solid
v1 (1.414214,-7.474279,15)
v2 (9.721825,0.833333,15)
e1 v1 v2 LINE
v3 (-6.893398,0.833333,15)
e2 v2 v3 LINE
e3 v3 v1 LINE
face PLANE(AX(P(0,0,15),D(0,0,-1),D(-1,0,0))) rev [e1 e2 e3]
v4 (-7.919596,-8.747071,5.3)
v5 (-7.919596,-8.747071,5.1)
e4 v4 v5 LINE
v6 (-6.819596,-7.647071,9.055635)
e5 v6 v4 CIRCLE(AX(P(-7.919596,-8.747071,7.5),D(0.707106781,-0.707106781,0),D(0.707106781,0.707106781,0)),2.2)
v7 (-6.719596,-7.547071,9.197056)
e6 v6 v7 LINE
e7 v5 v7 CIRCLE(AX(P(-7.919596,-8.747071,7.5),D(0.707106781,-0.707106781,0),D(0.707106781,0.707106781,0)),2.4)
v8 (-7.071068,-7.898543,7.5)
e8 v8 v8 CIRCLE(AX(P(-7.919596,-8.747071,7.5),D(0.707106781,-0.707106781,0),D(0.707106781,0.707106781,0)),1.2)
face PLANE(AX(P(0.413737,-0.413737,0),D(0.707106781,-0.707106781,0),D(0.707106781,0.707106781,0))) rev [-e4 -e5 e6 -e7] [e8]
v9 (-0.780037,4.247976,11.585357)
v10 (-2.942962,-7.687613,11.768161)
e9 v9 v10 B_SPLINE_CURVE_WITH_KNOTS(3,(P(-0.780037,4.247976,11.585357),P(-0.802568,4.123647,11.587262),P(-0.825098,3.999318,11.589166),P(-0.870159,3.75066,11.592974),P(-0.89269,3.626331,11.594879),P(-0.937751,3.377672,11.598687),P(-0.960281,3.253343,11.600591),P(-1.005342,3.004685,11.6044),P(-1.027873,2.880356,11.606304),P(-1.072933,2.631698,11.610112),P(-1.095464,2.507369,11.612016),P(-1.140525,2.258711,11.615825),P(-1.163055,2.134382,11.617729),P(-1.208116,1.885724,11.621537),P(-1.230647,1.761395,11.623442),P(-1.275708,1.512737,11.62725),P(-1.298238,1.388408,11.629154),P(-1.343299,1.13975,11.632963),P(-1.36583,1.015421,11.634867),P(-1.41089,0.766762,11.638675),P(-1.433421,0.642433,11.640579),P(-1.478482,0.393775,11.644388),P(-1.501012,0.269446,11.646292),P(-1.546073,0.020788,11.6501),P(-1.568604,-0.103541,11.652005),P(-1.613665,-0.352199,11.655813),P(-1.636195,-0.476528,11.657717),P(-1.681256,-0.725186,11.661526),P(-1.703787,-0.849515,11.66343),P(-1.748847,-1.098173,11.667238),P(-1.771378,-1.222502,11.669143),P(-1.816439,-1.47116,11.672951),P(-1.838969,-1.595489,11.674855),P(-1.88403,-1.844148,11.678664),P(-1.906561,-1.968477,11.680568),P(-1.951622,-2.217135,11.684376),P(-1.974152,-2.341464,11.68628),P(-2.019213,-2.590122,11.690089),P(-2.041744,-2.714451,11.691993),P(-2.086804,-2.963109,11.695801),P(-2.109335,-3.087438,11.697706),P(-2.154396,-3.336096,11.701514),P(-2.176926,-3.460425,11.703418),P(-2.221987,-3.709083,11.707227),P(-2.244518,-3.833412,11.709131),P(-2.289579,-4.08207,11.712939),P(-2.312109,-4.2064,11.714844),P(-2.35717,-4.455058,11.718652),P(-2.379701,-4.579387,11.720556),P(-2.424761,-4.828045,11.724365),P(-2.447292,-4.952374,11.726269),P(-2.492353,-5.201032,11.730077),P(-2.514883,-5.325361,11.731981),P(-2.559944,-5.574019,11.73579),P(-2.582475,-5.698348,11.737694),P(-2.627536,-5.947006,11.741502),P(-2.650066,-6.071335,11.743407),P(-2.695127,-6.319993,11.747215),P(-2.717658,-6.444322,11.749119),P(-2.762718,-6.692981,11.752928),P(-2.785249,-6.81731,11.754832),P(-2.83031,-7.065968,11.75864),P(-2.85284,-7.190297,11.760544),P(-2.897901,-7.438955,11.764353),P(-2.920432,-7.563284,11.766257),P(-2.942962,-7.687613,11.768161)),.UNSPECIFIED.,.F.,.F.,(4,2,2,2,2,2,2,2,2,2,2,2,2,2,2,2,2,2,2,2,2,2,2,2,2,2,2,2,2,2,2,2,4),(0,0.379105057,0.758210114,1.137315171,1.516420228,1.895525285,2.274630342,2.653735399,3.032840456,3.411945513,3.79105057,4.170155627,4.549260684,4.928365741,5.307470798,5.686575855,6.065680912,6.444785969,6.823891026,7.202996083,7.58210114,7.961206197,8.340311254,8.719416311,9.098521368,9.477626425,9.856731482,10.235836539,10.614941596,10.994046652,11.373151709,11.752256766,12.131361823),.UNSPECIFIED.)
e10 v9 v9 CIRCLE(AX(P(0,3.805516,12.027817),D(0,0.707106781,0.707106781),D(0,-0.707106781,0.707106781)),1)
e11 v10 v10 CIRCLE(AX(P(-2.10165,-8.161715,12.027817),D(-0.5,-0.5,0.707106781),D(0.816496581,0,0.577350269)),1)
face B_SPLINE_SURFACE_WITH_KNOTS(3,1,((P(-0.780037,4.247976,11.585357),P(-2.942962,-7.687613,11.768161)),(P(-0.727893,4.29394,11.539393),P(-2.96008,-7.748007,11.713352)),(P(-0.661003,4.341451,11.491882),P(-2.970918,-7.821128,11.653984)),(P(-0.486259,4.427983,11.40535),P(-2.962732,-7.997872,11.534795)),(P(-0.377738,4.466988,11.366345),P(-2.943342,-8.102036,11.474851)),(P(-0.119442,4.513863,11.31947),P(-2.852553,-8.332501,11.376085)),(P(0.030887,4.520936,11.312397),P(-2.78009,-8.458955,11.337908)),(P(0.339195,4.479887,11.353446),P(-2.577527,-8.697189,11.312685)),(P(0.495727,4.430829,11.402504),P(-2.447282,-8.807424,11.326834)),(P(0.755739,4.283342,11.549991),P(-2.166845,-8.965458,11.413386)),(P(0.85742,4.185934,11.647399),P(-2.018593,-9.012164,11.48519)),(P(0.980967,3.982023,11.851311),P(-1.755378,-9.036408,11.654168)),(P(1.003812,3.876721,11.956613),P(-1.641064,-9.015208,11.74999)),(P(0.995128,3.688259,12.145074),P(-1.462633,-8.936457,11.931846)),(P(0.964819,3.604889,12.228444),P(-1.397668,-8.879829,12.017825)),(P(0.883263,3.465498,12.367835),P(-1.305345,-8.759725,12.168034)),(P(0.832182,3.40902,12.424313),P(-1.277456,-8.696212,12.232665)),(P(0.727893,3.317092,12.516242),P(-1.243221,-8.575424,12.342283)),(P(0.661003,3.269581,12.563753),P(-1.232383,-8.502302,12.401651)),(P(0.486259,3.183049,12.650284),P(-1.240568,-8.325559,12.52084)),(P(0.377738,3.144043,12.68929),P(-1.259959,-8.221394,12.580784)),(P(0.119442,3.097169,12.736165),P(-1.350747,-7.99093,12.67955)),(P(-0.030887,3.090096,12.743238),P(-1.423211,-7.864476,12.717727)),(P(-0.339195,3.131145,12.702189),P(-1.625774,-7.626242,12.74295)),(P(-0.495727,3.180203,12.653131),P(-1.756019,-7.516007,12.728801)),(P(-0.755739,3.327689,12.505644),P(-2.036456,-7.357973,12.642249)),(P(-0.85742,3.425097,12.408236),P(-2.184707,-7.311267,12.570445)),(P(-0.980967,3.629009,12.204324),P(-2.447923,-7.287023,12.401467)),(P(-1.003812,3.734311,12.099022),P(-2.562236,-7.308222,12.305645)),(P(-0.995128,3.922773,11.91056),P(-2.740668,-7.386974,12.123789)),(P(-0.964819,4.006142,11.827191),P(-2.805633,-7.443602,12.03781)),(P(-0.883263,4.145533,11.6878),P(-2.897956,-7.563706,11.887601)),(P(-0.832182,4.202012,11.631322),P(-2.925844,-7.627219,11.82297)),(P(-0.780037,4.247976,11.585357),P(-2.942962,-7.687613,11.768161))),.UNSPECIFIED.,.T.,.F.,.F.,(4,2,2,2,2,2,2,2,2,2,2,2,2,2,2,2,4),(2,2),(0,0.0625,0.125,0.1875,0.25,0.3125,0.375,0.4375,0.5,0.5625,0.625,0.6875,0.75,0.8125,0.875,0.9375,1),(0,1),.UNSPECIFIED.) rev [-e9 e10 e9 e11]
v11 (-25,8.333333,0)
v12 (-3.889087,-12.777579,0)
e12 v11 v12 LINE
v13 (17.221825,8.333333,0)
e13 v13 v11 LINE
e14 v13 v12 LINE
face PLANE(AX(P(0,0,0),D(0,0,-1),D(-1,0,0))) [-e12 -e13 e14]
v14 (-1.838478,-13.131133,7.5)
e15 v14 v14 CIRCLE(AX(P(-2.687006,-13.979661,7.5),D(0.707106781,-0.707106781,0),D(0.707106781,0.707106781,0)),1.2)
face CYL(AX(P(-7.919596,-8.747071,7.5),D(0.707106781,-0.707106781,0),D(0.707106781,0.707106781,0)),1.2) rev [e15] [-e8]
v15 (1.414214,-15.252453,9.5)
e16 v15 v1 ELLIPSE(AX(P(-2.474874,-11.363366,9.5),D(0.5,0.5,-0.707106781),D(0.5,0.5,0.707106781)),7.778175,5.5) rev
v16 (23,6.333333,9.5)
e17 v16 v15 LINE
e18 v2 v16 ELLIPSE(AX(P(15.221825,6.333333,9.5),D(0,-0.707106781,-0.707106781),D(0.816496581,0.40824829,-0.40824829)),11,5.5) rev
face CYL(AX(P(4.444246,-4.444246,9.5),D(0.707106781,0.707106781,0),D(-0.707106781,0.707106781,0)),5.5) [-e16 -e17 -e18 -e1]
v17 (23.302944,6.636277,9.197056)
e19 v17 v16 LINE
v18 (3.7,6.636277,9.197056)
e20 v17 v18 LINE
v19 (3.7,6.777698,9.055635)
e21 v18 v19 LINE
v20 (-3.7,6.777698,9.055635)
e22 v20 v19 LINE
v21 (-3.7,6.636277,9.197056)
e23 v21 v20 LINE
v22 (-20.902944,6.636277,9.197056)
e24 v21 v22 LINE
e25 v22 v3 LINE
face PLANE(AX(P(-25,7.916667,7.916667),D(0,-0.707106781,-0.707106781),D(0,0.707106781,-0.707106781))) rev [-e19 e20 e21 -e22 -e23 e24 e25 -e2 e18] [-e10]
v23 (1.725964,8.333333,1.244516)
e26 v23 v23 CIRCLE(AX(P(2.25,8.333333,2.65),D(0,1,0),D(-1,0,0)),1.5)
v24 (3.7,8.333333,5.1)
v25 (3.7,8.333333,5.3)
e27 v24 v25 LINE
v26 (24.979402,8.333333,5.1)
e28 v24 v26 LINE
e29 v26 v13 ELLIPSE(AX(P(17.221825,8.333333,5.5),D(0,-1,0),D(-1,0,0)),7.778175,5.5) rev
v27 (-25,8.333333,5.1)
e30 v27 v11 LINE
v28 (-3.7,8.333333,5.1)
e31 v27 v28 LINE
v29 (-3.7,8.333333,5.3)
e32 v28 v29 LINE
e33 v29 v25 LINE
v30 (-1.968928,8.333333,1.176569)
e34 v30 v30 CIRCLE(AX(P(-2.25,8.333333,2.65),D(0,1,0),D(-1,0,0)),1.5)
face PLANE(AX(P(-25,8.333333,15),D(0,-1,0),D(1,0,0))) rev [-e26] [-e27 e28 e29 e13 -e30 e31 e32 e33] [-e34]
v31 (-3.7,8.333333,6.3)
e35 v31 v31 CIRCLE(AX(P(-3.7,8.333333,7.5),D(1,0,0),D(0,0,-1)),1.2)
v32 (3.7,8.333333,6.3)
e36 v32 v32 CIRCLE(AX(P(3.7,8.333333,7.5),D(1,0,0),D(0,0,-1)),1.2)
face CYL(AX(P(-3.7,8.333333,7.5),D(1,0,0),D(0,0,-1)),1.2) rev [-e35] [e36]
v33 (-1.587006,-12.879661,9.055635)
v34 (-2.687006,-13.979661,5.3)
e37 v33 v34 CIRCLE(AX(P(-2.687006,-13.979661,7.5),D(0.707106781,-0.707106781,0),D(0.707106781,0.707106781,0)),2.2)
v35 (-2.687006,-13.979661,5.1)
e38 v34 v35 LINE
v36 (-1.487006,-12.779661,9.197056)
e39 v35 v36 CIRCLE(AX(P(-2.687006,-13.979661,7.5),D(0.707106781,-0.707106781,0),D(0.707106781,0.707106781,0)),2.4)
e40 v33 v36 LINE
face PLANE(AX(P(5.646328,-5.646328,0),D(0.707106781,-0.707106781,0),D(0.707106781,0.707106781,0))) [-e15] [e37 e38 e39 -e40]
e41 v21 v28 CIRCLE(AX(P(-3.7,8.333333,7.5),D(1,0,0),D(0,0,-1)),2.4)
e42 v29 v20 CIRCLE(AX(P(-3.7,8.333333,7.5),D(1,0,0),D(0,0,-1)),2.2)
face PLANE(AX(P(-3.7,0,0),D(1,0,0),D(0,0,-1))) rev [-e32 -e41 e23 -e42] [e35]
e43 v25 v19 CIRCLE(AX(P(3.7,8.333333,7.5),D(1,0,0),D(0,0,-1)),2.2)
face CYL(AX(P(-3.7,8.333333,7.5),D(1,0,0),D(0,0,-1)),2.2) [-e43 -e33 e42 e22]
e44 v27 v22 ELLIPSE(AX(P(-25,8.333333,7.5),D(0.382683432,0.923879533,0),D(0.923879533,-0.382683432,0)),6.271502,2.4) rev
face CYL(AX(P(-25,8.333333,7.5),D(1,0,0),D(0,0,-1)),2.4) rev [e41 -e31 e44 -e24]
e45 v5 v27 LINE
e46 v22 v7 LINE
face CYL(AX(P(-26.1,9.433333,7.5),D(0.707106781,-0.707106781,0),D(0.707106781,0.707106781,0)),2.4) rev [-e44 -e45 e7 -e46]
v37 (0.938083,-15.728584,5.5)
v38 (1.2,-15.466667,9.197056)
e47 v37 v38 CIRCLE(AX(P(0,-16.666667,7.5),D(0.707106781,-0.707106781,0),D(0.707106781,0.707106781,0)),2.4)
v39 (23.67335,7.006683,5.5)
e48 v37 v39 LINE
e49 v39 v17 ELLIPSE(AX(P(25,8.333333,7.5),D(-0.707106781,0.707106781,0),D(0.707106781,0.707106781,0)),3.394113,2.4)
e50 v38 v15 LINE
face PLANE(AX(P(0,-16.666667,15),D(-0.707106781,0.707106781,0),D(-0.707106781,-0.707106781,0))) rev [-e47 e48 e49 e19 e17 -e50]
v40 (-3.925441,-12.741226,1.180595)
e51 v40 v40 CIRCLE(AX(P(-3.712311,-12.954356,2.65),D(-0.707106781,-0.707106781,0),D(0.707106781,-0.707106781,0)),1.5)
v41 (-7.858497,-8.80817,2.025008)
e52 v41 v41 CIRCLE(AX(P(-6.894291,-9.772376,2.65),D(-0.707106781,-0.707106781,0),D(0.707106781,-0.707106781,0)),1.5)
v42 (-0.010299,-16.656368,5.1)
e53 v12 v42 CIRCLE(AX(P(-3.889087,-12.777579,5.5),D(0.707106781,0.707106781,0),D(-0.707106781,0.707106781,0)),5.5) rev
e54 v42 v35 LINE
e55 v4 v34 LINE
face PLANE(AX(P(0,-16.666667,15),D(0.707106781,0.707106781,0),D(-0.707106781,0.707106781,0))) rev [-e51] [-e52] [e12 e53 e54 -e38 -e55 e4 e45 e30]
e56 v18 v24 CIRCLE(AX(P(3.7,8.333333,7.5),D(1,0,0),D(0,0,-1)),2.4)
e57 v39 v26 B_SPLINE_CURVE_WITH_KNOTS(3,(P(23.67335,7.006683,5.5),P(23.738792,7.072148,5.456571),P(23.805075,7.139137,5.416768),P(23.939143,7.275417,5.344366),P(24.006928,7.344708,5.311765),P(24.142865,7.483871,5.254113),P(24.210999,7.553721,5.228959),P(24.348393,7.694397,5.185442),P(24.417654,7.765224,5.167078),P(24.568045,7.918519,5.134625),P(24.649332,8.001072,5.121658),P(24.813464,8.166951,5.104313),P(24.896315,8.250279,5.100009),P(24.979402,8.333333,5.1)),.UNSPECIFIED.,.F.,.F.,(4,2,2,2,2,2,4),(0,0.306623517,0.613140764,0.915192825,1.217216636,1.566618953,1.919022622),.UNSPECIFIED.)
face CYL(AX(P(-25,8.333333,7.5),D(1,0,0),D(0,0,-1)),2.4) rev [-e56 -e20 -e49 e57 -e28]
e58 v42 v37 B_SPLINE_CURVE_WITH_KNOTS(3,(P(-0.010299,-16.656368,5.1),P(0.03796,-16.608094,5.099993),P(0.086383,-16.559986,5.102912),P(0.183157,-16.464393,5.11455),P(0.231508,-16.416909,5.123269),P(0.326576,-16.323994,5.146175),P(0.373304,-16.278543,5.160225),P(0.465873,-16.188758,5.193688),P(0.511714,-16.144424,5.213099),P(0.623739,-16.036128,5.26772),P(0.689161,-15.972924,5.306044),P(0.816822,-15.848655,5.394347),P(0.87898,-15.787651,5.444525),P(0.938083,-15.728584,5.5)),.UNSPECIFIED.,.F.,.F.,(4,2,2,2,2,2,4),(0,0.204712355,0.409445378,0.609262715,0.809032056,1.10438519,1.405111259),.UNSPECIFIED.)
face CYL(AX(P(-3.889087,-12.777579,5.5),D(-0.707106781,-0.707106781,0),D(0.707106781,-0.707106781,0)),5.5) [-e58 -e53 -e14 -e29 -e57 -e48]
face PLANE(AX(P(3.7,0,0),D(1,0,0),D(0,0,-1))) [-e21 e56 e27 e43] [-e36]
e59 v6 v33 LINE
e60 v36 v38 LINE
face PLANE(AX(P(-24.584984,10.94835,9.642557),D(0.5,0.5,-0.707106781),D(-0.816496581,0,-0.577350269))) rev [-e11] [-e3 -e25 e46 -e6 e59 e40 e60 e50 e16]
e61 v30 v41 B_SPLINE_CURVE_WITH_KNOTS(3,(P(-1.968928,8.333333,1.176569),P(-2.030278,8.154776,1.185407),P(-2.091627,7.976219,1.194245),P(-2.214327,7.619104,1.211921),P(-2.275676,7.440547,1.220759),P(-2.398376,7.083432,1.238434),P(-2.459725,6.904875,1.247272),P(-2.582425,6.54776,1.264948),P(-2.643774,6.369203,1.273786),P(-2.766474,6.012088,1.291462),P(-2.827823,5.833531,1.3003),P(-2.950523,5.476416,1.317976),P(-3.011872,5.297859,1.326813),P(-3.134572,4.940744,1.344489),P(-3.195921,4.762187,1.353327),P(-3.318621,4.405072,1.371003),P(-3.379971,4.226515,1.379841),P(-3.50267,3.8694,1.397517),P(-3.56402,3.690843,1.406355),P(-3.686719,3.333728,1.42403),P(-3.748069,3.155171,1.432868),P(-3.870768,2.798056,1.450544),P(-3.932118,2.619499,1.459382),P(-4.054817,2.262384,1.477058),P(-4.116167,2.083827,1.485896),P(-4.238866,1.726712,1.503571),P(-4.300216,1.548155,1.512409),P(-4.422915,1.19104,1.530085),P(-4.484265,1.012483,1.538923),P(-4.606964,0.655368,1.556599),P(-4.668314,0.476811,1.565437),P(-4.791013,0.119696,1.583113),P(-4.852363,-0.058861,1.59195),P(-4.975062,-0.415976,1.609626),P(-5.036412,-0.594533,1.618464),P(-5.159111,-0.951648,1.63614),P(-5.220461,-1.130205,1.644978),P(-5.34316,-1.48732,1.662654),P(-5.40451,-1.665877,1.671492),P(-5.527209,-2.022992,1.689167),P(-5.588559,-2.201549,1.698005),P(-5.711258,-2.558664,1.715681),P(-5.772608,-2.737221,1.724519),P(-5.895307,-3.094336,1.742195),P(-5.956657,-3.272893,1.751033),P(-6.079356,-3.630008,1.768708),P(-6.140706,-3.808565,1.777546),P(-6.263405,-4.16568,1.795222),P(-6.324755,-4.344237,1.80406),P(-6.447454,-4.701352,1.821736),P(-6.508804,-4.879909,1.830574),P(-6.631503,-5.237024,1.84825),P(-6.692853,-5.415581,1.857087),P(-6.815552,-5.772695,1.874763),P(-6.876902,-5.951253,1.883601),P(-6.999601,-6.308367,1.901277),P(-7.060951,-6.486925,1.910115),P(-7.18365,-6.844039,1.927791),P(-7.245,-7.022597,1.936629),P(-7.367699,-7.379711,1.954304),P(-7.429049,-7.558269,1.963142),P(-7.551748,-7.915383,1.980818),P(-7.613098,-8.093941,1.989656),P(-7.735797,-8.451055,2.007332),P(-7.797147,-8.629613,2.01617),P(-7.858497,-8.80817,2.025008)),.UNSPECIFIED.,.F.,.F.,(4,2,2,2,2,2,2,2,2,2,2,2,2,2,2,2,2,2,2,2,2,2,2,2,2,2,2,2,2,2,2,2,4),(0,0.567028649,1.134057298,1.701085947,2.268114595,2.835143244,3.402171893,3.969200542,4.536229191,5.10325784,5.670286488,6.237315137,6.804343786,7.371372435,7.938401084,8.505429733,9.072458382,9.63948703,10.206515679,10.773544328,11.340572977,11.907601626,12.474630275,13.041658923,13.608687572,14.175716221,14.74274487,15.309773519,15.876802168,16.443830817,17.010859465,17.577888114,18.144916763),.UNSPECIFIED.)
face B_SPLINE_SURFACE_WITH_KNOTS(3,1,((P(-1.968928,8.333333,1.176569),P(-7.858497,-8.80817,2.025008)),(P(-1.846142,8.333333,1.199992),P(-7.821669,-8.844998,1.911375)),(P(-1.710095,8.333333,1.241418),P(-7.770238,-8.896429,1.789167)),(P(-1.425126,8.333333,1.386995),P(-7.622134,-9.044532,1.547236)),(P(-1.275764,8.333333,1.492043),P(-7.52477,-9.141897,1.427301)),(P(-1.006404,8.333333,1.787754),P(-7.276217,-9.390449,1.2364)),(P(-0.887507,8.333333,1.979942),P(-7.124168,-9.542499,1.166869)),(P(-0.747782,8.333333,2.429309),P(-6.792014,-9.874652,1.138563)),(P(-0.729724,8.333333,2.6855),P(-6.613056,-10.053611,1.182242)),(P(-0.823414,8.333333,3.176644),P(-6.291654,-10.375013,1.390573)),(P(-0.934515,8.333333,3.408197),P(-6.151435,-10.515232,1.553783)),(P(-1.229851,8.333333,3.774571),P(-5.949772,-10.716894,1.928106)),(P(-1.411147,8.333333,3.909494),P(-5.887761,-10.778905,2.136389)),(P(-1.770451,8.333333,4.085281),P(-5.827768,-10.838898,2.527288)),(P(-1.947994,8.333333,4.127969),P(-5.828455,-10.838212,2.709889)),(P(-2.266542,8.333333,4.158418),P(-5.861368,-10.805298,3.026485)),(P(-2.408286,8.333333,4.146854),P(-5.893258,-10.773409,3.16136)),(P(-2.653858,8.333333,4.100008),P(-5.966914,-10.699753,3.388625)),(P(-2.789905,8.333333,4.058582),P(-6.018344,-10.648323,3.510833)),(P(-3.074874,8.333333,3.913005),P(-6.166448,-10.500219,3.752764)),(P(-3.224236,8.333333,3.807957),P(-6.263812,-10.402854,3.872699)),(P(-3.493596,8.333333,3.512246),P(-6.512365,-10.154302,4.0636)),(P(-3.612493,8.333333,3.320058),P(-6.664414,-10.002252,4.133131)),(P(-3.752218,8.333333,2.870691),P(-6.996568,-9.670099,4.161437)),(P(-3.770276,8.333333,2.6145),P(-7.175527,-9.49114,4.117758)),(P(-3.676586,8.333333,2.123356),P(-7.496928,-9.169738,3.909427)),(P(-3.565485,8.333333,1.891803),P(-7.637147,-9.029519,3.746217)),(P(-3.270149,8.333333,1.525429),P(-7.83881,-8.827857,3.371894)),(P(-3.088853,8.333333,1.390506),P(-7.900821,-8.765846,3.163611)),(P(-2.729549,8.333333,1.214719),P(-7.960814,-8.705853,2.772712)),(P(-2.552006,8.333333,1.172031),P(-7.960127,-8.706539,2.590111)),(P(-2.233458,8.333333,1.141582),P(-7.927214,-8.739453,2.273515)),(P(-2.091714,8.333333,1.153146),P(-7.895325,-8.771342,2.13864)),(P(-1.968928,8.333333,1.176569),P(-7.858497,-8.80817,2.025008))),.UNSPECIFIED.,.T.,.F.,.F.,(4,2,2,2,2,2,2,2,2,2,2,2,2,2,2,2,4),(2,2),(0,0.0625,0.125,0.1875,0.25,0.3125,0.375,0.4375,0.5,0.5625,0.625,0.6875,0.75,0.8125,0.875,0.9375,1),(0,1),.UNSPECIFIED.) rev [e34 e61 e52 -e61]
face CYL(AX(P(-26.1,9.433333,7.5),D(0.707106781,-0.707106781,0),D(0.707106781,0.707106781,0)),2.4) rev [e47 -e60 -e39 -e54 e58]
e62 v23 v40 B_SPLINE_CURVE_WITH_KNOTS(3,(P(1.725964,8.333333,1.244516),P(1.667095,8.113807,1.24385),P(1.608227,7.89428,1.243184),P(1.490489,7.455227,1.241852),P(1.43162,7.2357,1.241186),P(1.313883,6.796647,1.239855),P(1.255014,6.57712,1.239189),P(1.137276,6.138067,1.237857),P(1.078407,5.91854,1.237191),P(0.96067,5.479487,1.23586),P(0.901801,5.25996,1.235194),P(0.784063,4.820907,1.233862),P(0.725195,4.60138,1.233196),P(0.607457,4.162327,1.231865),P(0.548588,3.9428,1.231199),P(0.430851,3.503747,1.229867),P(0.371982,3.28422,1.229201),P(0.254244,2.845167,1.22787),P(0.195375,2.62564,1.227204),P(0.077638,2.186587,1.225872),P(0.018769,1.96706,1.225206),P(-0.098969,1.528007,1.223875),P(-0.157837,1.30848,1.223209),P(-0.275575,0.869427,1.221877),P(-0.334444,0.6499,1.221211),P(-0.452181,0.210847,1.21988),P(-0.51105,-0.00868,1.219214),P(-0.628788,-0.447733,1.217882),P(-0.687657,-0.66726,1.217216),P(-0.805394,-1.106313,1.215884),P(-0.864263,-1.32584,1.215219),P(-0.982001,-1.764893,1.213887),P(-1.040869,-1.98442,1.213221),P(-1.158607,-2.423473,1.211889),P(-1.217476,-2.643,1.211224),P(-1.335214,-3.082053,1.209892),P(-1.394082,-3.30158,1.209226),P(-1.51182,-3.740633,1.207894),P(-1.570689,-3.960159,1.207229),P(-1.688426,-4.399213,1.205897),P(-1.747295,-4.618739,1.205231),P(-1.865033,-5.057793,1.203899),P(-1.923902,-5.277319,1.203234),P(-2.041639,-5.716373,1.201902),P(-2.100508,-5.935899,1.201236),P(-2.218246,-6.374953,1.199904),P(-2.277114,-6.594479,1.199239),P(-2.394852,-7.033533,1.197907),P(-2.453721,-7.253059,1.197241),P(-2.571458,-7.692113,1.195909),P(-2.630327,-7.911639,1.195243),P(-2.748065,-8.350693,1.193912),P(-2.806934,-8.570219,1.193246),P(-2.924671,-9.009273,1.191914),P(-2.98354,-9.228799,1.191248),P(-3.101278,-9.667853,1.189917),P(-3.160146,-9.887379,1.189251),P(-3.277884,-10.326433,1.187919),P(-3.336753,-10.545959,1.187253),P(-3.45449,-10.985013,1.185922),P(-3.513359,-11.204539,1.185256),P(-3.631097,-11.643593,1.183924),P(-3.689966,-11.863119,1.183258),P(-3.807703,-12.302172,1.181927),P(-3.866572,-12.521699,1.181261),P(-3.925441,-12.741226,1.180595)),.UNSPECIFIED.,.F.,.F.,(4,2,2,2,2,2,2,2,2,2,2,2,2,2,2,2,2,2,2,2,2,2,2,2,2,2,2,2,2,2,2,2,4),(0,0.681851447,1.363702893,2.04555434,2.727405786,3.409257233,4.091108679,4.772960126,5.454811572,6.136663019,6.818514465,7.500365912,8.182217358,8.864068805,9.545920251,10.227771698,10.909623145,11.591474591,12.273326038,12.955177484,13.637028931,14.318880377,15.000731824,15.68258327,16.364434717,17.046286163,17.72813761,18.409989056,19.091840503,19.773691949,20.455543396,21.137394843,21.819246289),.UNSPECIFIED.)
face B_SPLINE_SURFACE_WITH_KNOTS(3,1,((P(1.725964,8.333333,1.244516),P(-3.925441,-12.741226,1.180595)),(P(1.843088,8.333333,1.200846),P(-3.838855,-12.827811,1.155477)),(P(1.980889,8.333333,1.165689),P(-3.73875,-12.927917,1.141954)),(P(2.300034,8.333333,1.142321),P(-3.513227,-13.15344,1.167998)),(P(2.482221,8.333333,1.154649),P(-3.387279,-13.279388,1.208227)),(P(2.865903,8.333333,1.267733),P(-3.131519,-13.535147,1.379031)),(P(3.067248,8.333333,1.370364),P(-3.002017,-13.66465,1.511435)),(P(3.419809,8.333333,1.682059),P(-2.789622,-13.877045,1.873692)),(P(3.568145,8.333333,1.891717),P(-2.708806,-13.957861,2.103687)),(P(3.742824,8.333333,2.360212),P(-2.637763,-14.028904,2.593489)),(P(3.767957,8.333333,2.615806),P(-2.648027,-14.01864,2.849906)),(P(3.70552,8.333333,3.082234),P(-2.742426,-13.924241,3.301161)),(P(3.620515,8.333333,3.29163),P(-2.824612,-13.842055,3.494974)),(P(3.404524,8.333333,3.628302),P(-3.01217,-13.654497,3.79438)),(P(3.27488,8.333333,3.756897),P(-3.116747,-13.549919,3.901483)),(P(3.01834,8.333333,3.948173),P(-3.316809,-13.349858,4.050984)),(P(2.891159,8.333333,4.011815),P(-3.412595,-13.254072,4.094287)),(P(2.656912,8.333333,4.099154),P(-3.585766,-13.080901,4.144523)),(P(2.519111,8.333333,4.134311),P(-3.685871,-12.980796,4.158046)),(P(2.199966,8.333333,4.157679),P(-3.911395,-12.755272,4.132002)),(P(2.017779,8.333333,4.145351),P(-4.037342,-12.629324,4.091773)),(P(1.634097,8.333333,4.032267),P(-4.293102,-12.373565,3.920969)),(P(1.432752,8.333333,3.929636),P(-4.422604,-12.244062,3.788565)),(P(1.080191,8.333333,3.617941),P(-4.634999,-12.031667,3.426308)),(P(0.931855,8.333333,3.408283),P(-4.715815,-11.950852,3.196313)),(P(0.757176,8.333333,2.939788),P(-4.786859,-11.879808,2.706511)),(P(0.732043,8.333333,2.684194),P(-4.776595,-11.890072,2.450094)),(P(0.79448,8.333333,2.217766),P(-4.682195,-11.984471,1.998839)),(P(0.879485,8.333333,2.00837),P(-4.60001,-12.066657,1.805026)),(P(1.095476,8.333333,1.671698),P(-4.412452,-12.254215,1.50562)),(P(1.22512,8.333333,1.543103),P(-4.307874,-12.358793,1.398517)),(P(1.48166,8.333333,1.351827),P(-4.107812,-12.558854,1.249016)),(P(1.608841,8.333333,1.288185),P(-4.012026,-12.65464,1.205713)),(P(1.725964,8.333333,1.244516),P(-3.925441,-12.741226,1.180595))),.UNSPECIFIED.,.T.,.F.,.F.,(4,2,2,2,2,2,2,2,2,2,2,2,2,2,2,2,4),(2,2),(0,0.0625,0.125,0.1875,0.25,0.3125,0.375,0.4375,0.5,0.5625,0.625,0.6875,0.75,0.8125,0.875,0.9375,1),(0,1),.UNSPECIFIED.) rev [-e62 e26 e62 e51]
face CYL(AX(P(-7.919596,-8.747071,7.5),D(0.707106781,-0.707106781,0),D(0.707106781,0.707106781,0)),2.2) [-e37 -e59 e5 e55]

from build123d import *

# Parameters (mm, degrees)
BOSS_EXTRUDE1_DEPTH      = 15
CUT_EXTRUDE1_DEPTH       = 34.582402799
CUT_EXTRUDE1_DEPTH_BACK  = 34.582402799
SKETCH2_R                = 2.4
BOSS_EXTRUDE2_DEPTH      = 3.7
BOSS_EXTRUDE2_DEPTH_BACK = 3.7
SKETCH4_R                = 2.4
SKETCH4_R_2              = 2.2
SKETCH4_R_3              = 1.2
CUT_EXTRUDE2_DEPTH       = 42.134683932
BOSS_EXTRUDE3_START      = -3.8
SKETCH4_3_R              = 1.2
BOSS_EXTRUDE3_DEPTH      = 7.4
FILLET1_R                = 5.5
FILLET2_R                = 5.5


with BuildPart() as part:
    # Sketch1 → Boss-Extrude1 (new body)
    with BuildSketch(Plane(origin=(0, 0, 0), x_dir=(0, 1, 0), z_dir=(0, 0, 1))):
        Polygon((8.333333333, 25), (8.333333333, -25), (-16.666666667, 0), align=None)
    extrude(amount=BOSS_EXTRUDE1_DEPTH)

    # Sketch2 → Cut-Extrude1 (cut, two sides: drawn at the far end of the back side and taken through both)
    with BuildSketch(Plane.YZ.offset(-CUT_EXTRUDE1_DEPTH_BACK)):
        with Locations((8.333333333, 7.5)):
            Circle(SKETCH2_R)
        Polygon((8.333333333, 7.5), (8.333333333, 15), (0.833333333, 15), align=None)
        with BuildLine():
            ThreePointArc((8.333333333, 9.9), (7.414893096, 9.717310878), (6.636277058, 9.197056275))
            Line((6.636277058, 9.197056275), (6.777698415, 9.055634919))
            ThreePointArc((6.777698415, 9.055634919), (7.491429782, 9.532534972), (8.333333333, 9.7))
            Line((8.333333333, 9.7), (8.333333333, 9.9))
        make_face()
        with BuildLine():
            ThreePointArc((8.333333333, 9.7), (7.491429782, 9.532534972), (6.777698415, 9.055634919))
            Line((6.777698415, 9.055634919), (7.484805196, 8.348528137))
            ThreePointArc((7.484805196, 8.348528137), (7.874113214, 8.608655439), (8.333333333, 8.7))
            Line((8.333333333, 8.7), (8.333333333, 9.7))
        make_face()
        with BuildLine():
            Line((7.484805196, 8.348528137), (6.777698415, 9.055634919))
            ThreePointArc((6.777698415, 9.055634919), (6.300798362, 6.658096449), (8.333333333, 5.3))
            ThreePointArc((8.333333333, 5.3), (9.888968252, 5.944365081), (10.533333333, 7.5))
            ThreePointArc((10.533333333, 7.5), (9.888968252, 9.055634919), (8.333333333, 9.7))
            Line((8.333333333, 9.7), (8.333333333, 8.7))
            ThreePointArc((8.333333333, 8.7), (9.181861471, 8.348528137), (9.533333333, 7.5))
            ThreePointArc((9.533333333, 7.5), (7.874113214, 6.391344561), (7.484805196, 8.348528137))
        make_face()
        with BuildLine():
            ThreePointArc((8.333333333, 8.7), (7.874113214, 8.608655439), (7.484805196, 8.348528137))
            Line((7.484805196, 8.348528137), (8.333333333, 7.5))
            Line((8.333333333, 7.5), (8.333333333, 8.7))
        make_face()
        with BuildLine():
            Line((8.333333333, 7.5), (7.484805196, 8.348528137))
            ThreePointArc((7.484805196, 8.348528137), (7.874113214, 6.391344561), (9.533333333, 7.5))
            ThreePointArc((9.533333333, 7.5), (9.181861471, 8.348528137), (8.333333333, 8.7))
            Line((8.333333333, 8.7), (8.333333333, 7.5))
        make_face()
    extrude(amount=CUT_EXTRUDE1_DEPTH + CUT_EXTRUDE1_DEPTH_BACK, mode=Mode.SUBTRACT)

    # Sketch2<5> → Boss-Extrude2 (add, two sides: drawn at the far end of the back side and taken through both)
    with BuildSketch(Plane.YZ.offset(-BOSS_EXTRUDE2_DEPTH_BACK)):
        with BuildLine():
            Line((6.777698415, 9.055634919), (6.636277058, 9.197056275))
            ThreePointArc((6.636277058, 9.197056275), (6.116022455, 6.581559762), (8.333333333, 5.1))
            Line((8.333333333, 5.1), (8.333333333, 5.3))
            ThreePointArc((8.333333333, 5.3), (6.300798362, 6.658096449), (6.777698415, 9.055634919))
        make_face()
        with BuildLine():
            ThreePointArc((8.333333333, 9.7), (7.491429782, 9.532534972), (6.777698415, 9.055634919))
            Line((6.777698415, 9.055634919), (7.484805196, 8.348528137))
            ThreePointArc((7.484805196, 8.348528137), (7.874113214, 8.608655439), (8.333333333, 8.7))
            Line((8.333333333, 8.7), (8.333333333, 9.7))
        make_face()
        with BuildLine():
            Line((7.484805196, 8.348528137), (6.777698415, 9.055634919))
            ThreePointArc((6.777698415, 9.055634919), (6.300798362, 6.658096449), (8.333333333, 5.3))
            ThreePointArc((8.333333333, 5.3), (9.888968252, 5.944365081), (10.533333333, 7.5))
            ThreePointArc((10.533333333, 7.5), (9.888968252, 9.055634919), (8.333333333, 9.7))
            Line((8.333333333, 9.7), (8.333333333, 8.7))
            ThreePointArc((8.333333333, 8.7), (9.181861471, 8.348528137), (9.533333333, 7.5))
            ThreePointArc((9.533333333, 7.5), (7.874113214, 6.391344561), (7.484805196, 8.348528137))
        make_face()
    extrude(amount=BOSS_EXTRUDE2_DEPTH + BOSS_EXTRUDE2_DEPTH_BACK)

    # Sketch4 → Cut-Extrude2 (cut, through all)
    # profile 1 of 3: a face of its own
    with BuildSketch(Plane(origin=(8.333333333, -8.333333333, 0), x_dir=(0.7071067811865486, 0.7071067811865465, 0), z_dir=(0.7071067811865465, -0.7071067811865486, 0))):
        with Locations((-11.78511302, 7.5)):
            Circle(SKETCH4_R)
        with Locations((-11.78511302, 7.5)):
            Circle(SKETCH4_R_2, mode=Mode.SUBTRACT)
    # profile 2 of 3: a face of its own
    with BuildSketch(Plane(origin=(8.333333333, -8.333333333, 0), x_dir=(0.7071067811865486, 0.7071067811865465, 0), z_dir=(0.7071067811865465, -0.7071067811865486, 0))):
        with Locations((-11.78511302, 7.5)):
            Circle(SKETCH4_R_3)
    # profile 3 of 3: a face of its own
    with BuildSketch(Plane(origin=(8.333333333, -8.333333333, 0), x_dir=(0.7071067811865486, 0.7071067811865465, 0), z_dir=(0.7071067811865465, -0.7071067811865486, 0))):
        Polygon((-11.78511302, 7.5), (-4.28511302, 15), (-11.78511302, 15), align=None)
    extrude(amount=-CUT_EXTRUDE2_DEPTH, mode=Mode.SUBTRACT)


with BuildPart() as cut_extrude2_kept_piece:
    # of the separate pieces the step leaves, the one the design keeps (cut_extrude2_pieces_kept)
    add(part.part.solids().sort_by_distance((-25, 8.333333333, 0))[0])

    # Sketch4<3> → Boss-Extrude3 (add)
    with BuildSketch(Plane(origin=(8.333333333, -8.333333333, 0), x_dir=(0.7071067811865486, 0.7071067811865465, 0), z_dir=(0.7071067811865465, -0.7071067811865486, 0)).offset(BOSS_EXTRUDE3_START)):
        with BuildLine():
            Line((-11.78511302, 5.3), (-11.78511302, 5.1))
            ThreePointArc((-11.78511302, 5.1), (-9.567802142, 6.581559762), (-10.088056745, 9.197056275))
            Line((-10.088056745, 9.197056275), (-10.229478101, 9.055634919))
            ThreePointArc((-10.229478101, 9.055634919), (-13.817647991, 8.341903551), (-11.78511302, 5.3))
        make_face()
        with Locations((-11.78511302, 7.5)):
            Circle(SKETCH4_3_R, mode=Mode.SUBTRACT)
    extrude(amount=-BOSS_EXTRUDE3_DEPTH)

    # Fillet1
    fillet1_edges = [cut_extrude2_kept_piece.edges().sort_by_distance(p)[0] for p in [
        (12.5, -4.166666667, 0),
    ]]
    fillet(fillet1_edges, radius=FILLET1_R)

    # Fillet2
    fillet2_edges = [cut_extrude2_kept_piece.edges().sort_by_distance(p)[0] for p in [
        (11.401650429, -5.265016237, 15),
    ]]
    fillet(fillet2_edges, radius=FILLET2_R)

    # Cut-Loft1: read off the stored shape, not the designer's step
    # Cut-Loft1: loft between two sections, ruled curve by curve
    cut_loft1_from = [
        Edge.make_bspline([(-0.780037402, 4.247975845, 11.585357488), (-0.727892994, 4.29393999, 11.539393344), (-0.661002861, 4.341451036, 11.491882298), (-0.486258531, 4.427982909, 11.405350424), (-0.37773802, 4.466988385, 11.366344948), (-0.119442352, 4.513863, 11.319470333), (0.030886977, 4.520936001, 11.312397333), (0.339194689, 4.479887019, 11.353446314), (0.495726658, 4.430828939, 11.402504394), (0.755739125, 4.283342282, 11.549991051), (0.85742023, 4.185934374, 11.647398959), (0.980967134, 3.982022818, 11.851310515), (1.003811506, 3.876720642, 11.956612691), (0.995127807, 3.688258836, 12.145074497), (0.964819046, 3.604889374, 12.22844396), (0.883263184, 3.465498283, 12.367835051), (0.832181809, 3.409020048, 12.424313286), (0.727892994, 3.317091758, 12.516241575), (0.661002861, 3.269580712, 12.563752621), (0.486258531, 3.183048839, 12.650284494), (0.37773802, 3.144043363, 12.68928997), (0.119442352, 3.097168748, 12.736164585), (-0.030886977, 3.090095747, 12.743237586), (-0.339194689, 3.131144729, 12.702188605), (-0.495726658, 3.180202809, 12.653130524), (-0.755739125, 3.327689466, 12.505643867), (-0.85742023, 3.425097374, 12.40823596), (-0.980967134, 3.62900893, 12.204324403), (-1.003811506, 3.734311106, 12.099022227), (-0.995127807, 3.922772912, 11.910560421), (-0.964819046, 4.006142375, 11.827190959), (-0.883263184, 4.145533465, 11.687799868), (-0.832181809, 4.2020117, 11.631321633), (-0.780037402, 4.247975845, 11.585357488)], [0, 0, 0, 0, 0.0625, 0.0625, 0.125, 0.125, 0.1875, 0.1875, 0.25, 0.25, 0.3125, 0.3125, 0.375, 0.375, 0.4375, 0.4375, 0.5, 0.5, 0.5625, 0.5625, 0.625, 0.625, 0.6875, 0.6875, 0.75, 0.75, 0.8125, 0.8125, 0.875, 0.875, 0.9375, 0.9375, 1, 1, 1, 1], 3),
    ]
    cut_loft1_to = [
        Edge.make_bspline([(-2.942962207, -7.687612903, 11.768161272), (-2.960079955, -7.748006682, 11.713352345), (-2.97091826, -7.821128364, 11.653983669), (-2.962732482, -7.997871839, 11.534795379), (-2.943341865, -8.102036376, 11.474851165), (-2.852553416, -8.332500848, 11.376085302), (-2.780090013, -8.458954557, 11.33790839), (-2.577527193, -8.697189205, 11.312684599), (-2.447282041, -8.807423656, 11.326834302), (-2.166844782, -8.965457814, 11.413386364), (-2.018593417, -9.01216386, 11.485189748), (-1.75537809, -9.036408091, 11.65416783), (-1.641064457, -9.015208413, 11.749990212), (-1.462633136, -8.936456733, 11.931846055), (-1.397668226, -8.879828871, 12.017825129), (-1.30534529, -8.759724839, 12.168033678), (-1.2774564, -8.696211634, 12.23266472), (-1.243220903, -8.575424074, 12.342282574), (-1.232382599, -8.502302392, 12.40165125), (-1.240568377, -8.325558918, 12.52083954), (-1.259958994, -8.221394381, 12.580783753), (-1.350747443, -7.990929909, 12.679549617), (-1.423210846, -7.8644762, 12.717726528), (-1.625773666, -7.626241552, 12.74295032), (-1.756018818, -7.516007101, 12.728800617), (-2.036456077, -7.357972942, 12.642248555), (-2.184707442, -7.311266897, 12.570445171), (-2.447922769, -7.287022665, 12.401467089), (-2.562236402, -7.308222344, 12.305644707), (-2.740667723, -7.386974024, 12.123788863), (-2.805632633, -7.443601886, 12.037809789), (-2.897955569, -7.563705918, 11.88760124), (-2.925844458, -7.627219123, 11.822970199), (-2.942962207, -7.687612903, 11.768161272)], [0, 0, 0, 0, 0.0625, 0.0625, 0.125, 0.125, 0.1875, 0.1875, 0.25, 0.25, 0.3125, 0.3125, 0.375, 0.375, 0.4375, 0.4375, 0.5, 0.5, 0.5625, 0.5625, 0.625, 0.625, 0.6875, 0.6875, 0.75, 0.75, 0.8125, 0.8125, 0.875, 0.875, 0.9375, 0.9375, 1, 1, 1, 1], 3),
    ]
    cut_loft1 = Solid(Shell([*[Face.make_surface_from_curves(cut_loft1_from[k], cut_loft1_to[k]) for k in range(1)], Face(Wire(cut_loft1_from)), Face(Wire(cut_loft1_to))]))
    add(cut_loft1, mode=Mode.SUBTRACT)

    # Cut-Loft2: read off the stored shape, not the designer's step
    # Cut-Loft2: loft between two sections, ruled curve by curve
    cut_loft2_from = [
        Edge.make_bspline([(-1.968928028, 8.333333333, 1.176569124), (-1.846142122, 8.333333333, 1.199991788), (-1.710094901, 8.333333333, 1.241418272), (-1.425125623, 8.333333333, 1.38699475), (-1.275764099, 8.333333333, 1.492043002), (-1.006403694, 8.333333333, 1.787753963), (-0.887507445, 8.333333333, 1.979942272), (-0.747782094, 8.333333333, 2.429308619), (-0.729723795, 8.333333333, 2.685500159), (-0.823414453, 8.333333333, 3.176643785), (-0.934515031, 8.333333333, 3.408196952), (-1.229851161, 8.333333333, 3.774570882), (-1.411147334, 8.333333333, 3.909494424), (-1.77045077, 8.333333333, 4.085281344), (-1.947994443, 8.333333333, 4.127969094), (-2.266542452, 8.333333333, 4.158418492), (-2.408286066, 8.333333333, 4.14685354), (-2.653857878, 8.333333333, 4.100008212), (-2.789905099, 8.333333333, 4.058581728), (-3.074874377, 8.333333333, 3.91300525), (-3.224235901, 8.333333333, 3.807956998), (-3.493596306, 8.333333333, 3.512246037), (-3.612492555, 8.333333333, 3.320057728), (-3.752217906, 8.333333333, 2.870691381), (-3.770276205, 8.333333333, 2.614499841), (-3.676585547, 8.333333333, 2.123356215), (-3.565484969, 8.333333333, 1.891803048), (-3.270148839, 8.333333333, 1.525429118), (-3.088852666, 8.333333333, 1.390505576), (-2.72954923, 8.333333333, 1.214718656), (-2.552005557, 8.333333333, 1.172030906), (-2.233457548, 8.333333333, 1.141581508), (-2.091713934, 8.333333333, 1.15314646), (-1.968928028, 8.333333333, 1.176569124)], [0, 0, 0, 0, 0.0625, 0.0625, 0.125, 0.125, 0.1875, 0.1875, 0.25, 0.25, 0.3125, 0.3125, 0.375, 0.375, 0.4375, 0.4375, 0.5, 0.5, 0.5625, 0.5625, 0.625, 0.625, 0.6875, 0.6875, 0.75, 0.75, 0.8125, 0.8125, 0.875, 0.875, 0.9375, 0.9375, 1, 1, 1, 1], 3),
    ]
    cut_loft2_to = [
        Edge.make_bspline([(-7.858496611, -8.808170056, 2.025007577), (-7.821668579, -8.844998088, 1.911374869), (-7.770238094, -8.896428573, 1.789166807), (-7.622134315, -9.044532352, 1.547235947), (-7.524770004, -9.141896663, 1.42730104), (-7.276217363, -9.390449303, 1.236400098), (-7.124167816, -9.542498851, 1.166869281), (-6.792014211, -9.874652456, 1.138562872), (-6.613055651, -10.053611015, 1.182242109), (-6.29165382, -10.375012847, 1.390572917), (-6.151434782, -10.515231885, 1.553782752), (-5.949772196, -10.71689447, 1.928105728), (-5.887761452, -10.778905215, 2.136389187), (-5.827768334, -10.838898333, 2.527287706), (-5.828454974, -10.838211693, 2.709888519), (-5.861368337, -10.80529833, 3.026485141), (-5.893257591, -10.773409076, 3.161359716), (-5.966913654, -10.699753013, 3.388625131), (-6.018344139, -10.648322528, 3.510833193), (-6.166447918, -10.500218749, 3.752764053), (-6.263812229, -10.402854437, 3.87269896), (-6.51236487, -10.154301797, 4.063599902), (-6.664414418, -10.002252249, 4.133130719), (-6.996568022, -9.670098644, 4.161437128), (-7.175526582, -9.491140085, 4.117757891), (-7.496928413, -9.169738254, 3.909427083), (-7.637147451, -9.029519216, 3.746217248), (-7.838810037, -8.82785663, 3.371894272), (-7.900820782, -8.765845885, 3.163610813), (-7.960813899, -8.705852767, 2.772712294), (-7.960127259, -8.706539408, 2.590111481), (-7.927213896, -8.73945277, 2.273514859), (-7.895324643, -8.771342024, 2.138640284), (-7.858496611, -8.808170056, 2.025007577)], [0, 0, 0, 0, 0.0625, 0.0625, 0.125, 0.125, 0.1875, 0.1875, 0.25, 0.25, 0.3125, 0.3125, 0.375, 0.375, 0.4375, 0.4375, 0.5, 0.5, 0.5625, 0.5625, 0.625, 0.625, 0.6875, 0.6875, 0.75, 0.75, 0.8125, 0.8125, 0.875, 0.875, 0.9375, 0.9375, 1, 1, 1, 1], 3),
    ]
    cut_loft2 = Solid(Shell([*[Face.make_surface_from_curves(cut_loft2_from[k], cut_loft2_to[k]) for k in range(1)], Face(Wire(cut_loft2_from)), Face(Wire(cut_loft2_to))]))
    add(cut_loft2, mode=Mode.SUBTRACT)

    # Cut-Loft3: read off the stored shape, not the designer's step
    # Cut-Loft3: loft between two sections, ruled curve by curve
    cut_loft3_from = [
        Edge.make_bspline([(1.725964289, 8.333333333, 1.244515538), (1.843087995, 8.333333333, 1.200845895), (1.980888558, 8.333333333, 1.165689038), (2.300034176, 8.333333333, 1.142320796), (2.482220909, 8.333333333, 1.154649389), (2.865903308, 8.333333333, 1.267732618), (3.067247697, 8.333333333, 1.370363519), (3.419808921, 8.333333333, 1.682058674), (3.568145177, 8.333333333, 1.891716879), (3.742823747, 8.333333333, 2.3602117), (3.767957213, 8.333333333, 2.615806137), (3.705519566, 8.333333333, 3.082233867), (3.620514732, 8.333333333, 3.291630244), (3.40452376, 8.333333333, 3.628302043), (3.274880341, 8.333333333, 3.756896692), (3.018339523, 8.333333333, 3.948173478), (2.891159416, 8.333333333, 4.01181482), (2.656912005, 8.333333333, 4.099154105), (2.519111442, 8.333333333, 4.134310962), (2.199965824, 8.333333333, 4.157679204), (2.017779091, 8.333333333, 4.145350611), (1.634096692, 8.333333333, 4.032267382), (1.432752303, 8.333333333, 3.929636481), (1.080191079, 8.333333333, 3.617941326), (0.931854823, 8.333333333, 3.408283121), (0.757176253, 8.333333333, 2.9397883), (0.732042787, 8.333333333, 2.684193863), (0.794480434, 8.333333333, 2.217766133), (0.879485268, 8.333333333, 2.008369756), (1.09547624, 8.333333333, 1.671697957), (1.225119659, 8.333333333, 1.543103308), (1.481660477, 8.333333333, 1.351826522), (1.608840584, 8.333333333, 1.28818518), (1.725964289, 8.333333333, 1.244515538)], [0, 0, 0, 0, 0.0625, 0.0625, 0.125, 0.125, 0.1875, 0.1875, 0.25, 0.25, 0.3125, 0.3125, 0.375, 0.375, 0.4375, 0.4375, 0.5, 0.5, 0.5625, 0.5625, 0.625, 0.625, 0.6875, 0.6875, 0.75, 0.75, 0.8125, 0.8125, 0.875, 0.875, 0.9375, 0.9375, 1, 1, 1, 1], 3),
    ]
    cut_loft3_to = [
        Edge.make_bspline([(-3.92544087, -12.741225796, 1.180595026), (-3.838855352, -12.827811315, 1.155477383), (-3.738750093, -12.927916573, 1.141954276), (-3.513226542, -13.153440125, 1.167997613), (-3.387278969, -13.279387698, 1.208227176), (-3.131519199, -13.535147468, 1.379030806), (-3.002016946, -13.664649721, 1.511435479), (-2.789621766, -13.8770449, 1.873692104), (-2.708806091, -13.957860575, 2.103687454), (-2.637762668, -14.028903998, 2.593489112), (-2.64802657, -14.018640096, 2.849905789), (-2.742425753, -13.924240913, 3.301160568), (-2.824611611, -13.842055055, 3.494973968), (-3.012169695, -13.654496971, 3.79437993), (-3.116747407, -13.54991926, 3.901482706), (-3.316808995, -13.349857671, 4.050984282), (-3.412594814, -13.254071853, 4.094287331), (-3.585765851, -13.080900816, 4.144522617), (-3.685871109, -12.980795558, 4.158045724), (-3.911394661, -12.755272006, 4.132002387), (-4.037342234, -12.629324433, 4.091772824), (-4.293102004, -12.373564663, 3.920969194), (-4.422604256, -12.24406241, 3.788564521), (-4.634999436, -12.03166723, 3.426307896), (-4.715815111, -11.950851556, 3.196312546), (-4.786858534, -11.879808133, 2.706510888), (-4.776594632, -11.890072034, 2.450094211), (-4.682195449, -11.984471218, 1.998839432), (-4.600009591, -12.066657075, 1.805026032), (-4.412451507, -12.25421516, 1.50562007), (-4.307873796, -12.358792871, 1.398517294), (-4.107812207, -12.55885446, 1.249015718), (-4.012026389, -12.654640278, 1.205712669), (-3.92544087, -12.741225796, 1.180595026)], [0, 0, 0, 0, 0.0625, 0.0625, 0.125, 0.125, 0.1875, 0.1875, 0.25, 0.25, 0.3125, 0.3125, 0.375, 0.375, 0.4375, 0.4375, 0.5, 0.5, 0.5625, 0.5625, 0.625, 0.625, 0.6875, 0.6875, 0.75, 0.75, 0.8125, 0.8125, 0.875, 0.875, 0.9375, 0.9375, 1, 1, 1, 1], 3),
    ]
    cut_loft3 = Solid(Shell([*[Face.make_surface_from_curves(cut_loft3_from[k], cut_loft3_to[k]) for k in range(1)], Face(Wire(cut_loft3_from)), Face(Wire(cut_loft3_to))]))
    add(cut_loft3, mode=Mode.SUBTRACT)


solid = cut_extrude2_kept_piece.part
